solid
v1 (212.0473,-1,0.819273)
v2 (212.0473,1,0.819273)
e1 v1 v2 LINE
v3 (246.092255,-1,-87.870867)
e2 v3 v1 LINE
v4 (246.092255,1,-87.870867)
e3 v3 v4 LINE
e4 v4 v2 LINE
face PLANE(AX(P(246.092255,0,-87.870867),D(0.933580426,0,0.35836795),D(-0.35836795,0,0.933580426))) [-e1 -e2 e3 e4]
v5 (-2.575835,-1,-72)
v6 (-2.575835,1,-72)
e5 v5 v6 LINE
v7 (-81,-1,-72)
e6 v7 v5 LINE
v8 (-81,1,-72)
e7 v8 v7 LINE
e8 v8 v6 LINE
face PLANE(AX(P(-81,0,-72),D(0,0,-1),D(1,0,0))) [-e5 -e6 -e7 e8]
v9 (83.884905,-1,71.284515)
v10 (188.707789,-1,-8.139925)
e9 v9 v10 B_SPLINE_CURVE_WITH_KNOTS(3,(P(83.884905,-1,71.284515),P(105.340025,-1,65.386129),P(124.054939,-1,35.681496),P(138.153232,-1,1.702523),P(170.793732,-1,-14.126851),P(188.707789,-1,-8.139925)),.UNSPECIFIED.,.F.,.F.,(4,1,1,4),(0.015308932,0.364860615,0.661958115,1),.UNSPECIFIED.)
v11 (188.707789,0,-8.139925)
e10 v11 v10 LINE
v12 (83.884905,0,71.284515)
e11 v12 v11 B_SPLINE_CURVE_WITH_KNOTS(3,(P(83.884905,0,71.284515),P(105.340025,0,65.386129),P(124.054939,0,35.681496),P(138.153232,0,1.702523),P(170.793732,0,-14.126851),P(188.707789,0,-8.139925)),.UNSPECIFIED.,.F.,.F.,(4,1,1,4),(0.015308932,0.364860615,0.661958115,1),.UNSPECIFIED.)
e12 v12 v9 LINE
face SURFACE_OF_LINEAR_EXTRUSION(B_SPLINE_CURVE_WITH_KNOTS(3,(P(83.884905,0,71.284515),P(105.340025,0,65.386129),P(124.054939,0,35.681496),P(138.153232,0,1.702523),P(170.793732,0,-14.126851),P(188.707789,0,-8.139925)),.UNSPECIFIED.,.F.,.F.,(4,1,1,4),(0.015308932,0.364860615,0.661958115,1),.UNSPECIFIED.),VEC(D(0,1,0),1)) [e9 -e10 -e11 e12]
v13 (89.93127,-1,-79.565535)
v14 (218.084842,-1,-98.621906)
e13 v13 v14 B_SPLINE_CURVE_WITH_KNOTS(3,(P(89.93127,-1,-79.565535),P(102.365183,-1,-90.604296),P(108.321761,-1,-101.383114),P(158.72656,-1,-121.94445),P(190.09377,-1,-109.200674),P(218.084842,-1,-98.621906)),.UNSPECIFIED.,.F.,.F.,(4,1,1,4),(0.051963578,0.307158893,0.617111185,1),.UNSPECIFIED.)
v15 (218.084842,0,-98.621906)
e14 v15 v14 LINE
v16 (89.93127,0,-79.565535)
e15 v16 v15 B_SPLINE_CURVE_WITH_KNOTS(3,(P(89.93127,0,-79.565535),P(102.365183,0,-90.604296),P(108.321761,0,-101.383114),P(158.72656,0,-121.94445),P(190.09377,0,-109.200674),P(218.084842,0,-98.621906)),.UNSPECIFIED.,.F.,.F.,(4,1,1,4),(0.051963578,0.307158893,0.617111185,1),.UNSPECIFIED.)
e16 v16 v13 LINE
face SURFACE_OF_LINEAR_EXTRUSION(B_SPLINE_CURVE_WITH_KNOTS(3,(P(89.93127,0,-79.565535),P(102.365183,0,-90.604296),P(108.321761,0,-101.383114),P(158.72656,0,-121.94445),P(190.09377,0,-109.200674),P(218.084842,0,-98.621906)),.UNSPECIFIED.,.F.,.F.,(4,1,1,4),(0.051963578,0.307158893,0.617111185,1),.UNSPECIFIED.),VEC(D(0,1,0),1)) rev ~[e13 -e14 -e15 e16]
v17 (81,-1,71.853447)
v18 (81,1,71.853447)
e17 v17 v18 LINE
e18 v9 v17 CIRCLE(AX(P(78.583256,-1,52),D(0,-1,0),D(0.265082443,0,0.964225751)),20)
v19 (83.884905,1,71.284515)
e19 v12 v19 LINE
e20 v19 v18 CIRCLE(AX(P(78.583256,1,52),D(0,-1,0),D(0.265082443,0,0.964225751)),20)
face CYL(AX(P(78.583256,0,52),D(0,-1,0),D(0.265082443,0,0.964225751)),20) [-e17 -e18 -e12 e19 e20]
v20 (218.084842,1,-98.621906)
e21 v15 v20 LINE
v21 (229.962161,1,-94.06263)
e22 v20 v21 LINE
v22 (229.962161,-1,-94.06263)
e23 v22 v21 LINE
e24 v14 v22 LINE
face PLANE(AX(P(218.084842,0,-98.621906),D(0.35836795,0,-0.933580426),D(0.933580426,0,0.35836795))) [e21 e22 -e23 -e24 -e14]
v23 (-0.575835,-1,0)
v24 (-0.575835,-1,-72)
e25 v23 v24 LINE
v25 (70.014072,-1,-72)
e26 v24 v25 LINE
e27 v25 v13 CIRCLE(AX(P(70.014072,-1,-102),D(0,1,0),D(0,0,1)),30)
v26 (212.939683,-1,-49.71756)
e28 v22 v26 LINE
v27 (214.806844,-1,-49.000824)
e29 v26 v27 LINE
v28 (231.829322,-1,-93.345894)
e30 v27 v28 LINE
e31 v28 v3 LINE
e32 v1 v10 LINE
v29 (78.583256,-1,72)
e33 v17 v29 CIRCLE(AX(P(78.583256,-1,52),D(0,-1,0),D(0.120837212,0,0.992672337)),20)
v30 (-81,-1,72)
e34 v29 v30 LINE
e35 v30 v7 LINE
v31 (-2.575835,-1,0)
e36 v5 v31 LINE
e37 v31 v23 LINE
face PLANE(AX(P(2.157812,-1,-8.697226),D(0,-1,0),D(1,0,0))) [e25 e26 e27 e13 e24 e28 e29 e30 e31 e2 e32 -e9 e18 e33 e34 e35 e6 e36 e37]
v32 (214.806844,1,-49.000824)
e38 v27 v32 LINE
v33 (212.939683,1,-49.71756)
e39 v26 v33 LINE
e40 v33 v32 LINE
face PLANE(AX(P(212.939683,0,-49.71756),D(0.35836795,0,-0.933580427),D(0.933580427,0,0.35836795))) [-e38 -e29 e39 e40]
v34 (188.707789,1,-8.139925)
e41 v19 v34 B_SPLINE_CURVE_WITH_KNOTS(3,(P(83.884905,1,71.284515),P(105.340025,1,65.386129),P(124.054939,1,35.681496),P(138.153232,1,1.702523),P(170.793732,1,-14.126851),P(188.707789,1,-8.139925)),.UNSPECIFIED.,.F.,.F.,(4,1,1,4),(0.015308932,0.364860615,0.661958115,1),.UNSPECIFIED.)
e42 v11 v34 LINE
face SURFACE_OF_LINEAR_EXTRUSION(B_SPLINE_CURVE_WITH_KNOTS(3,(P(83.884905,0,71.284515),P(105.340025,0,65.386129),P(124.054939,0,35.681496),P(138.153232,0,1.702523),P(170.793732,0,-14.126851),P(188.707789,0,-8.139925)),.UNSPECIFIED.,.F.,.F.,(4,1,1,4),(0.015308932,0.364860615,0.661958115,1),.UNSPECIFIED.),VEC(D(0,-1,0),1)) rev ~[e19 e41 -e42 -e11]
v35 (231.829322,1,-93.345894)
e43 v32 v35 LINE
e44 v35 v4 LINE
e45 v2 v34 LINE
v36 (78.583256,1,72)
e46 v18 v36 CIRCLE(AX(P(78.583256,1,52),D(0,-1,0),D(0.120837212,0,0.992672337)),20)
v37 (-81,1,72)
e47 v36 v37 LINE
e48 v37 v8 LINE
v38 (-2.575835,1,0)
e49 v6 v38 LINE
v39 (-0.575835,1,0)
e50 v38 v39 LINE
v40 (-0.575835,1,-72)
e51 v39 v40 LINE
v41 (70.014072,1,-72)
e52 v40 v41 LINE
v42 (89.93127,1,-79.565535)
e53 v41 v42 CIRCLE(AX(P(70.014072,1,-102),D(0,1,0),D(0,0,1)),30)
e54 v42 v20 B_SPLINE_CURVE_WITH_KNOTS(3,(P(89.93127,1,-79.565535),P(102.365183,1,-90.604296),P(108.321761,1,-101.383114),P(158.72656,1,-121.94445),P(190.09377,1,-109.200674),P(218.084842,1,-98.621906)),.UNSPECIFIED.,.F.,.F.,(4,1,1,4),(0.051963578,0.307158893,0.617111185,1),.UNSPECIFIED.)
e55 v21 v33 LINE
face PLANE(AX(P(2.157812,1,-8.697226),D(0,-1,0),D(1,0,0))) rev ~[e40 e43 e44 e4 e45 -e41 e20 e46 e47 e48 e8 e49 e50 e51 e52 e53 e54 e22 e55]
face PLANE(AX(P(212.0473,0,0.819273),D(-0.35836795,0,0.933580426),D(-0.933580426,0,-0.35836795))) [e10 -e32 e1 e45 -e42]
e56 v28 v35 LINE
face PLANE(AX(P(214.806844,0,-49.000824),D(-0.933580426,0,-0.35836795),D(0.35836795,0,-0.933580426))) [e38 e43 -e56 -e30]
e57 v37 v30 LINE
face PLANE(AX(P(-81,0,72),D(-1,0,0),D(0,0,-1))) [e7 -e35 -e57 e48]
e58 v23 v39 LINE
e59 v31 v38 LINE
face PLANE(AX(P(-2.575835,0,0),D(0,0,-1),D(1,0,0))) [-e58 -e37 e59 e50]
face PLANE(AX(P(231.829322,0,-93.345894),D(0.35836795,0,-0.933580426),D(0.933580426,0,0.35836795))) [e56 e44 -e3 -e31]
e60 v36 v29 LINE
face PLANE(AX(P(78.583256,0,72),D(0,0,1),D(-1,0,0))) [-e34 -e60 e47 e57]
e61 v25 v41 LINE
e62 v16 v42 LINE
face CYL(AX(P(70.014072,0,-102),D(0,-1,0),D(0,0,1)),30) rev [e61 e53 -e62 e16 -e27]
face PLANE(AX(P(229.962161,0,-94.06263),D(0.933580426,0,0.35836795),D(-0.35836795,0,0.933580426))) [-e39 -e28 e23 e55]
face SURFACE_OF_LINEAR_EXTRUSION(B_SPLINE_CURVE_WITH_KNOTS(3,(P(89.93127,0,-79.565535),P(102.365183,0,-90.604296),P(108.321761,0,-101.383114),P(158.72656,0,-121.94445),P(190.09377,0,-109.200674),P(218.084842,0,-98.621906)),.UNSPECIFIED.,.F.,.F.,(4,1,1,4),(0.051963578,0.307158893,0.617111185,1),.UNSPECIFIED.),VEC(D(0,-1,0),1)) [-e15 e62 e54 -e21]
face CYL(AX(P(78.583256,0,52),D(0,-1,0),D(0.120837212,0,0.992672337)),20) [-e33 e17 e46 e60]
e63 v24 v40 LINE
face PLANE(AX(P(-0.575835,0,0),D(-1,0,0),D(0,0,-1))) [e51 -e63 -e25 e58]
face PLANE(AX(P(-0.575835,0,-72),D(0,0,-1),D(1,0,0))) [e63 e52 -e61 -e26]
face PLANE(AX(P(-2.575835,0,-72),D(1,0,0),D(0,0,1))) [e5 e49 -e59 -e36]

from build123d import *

# Parameters (mm, degrees)
F1_DEPTH = 1


with BuildPart() as f1:
    # F0 (on Front) → F1 (new body, symmetric)
    with BuildSketch(Plane.XZ):
        with BuildLine():
            Line((78.5832557587, 72), (-81, 72))
            Line((-81, 72), (-81, -72))
            Line((-81, -72), (-2.5758354459, -72))
            Line((-2.5758354459, -72), (-2.5758354459, 0))
            Line((-2.5758354459, 0), (-0.5758354459, 0))
            Line((-0.5758354459, 0), (-0.5758354459, -72))
            Line((-0.5758354459, -72), (70.0140722752, -72))
            ThreePointArc((70.0140722752, -72), (80.6669131732, -73.9550899306), (89.9312699398, -79.5655346133))
            add(Edge.make_bspline(
                [(81, -72), (84.4635983749, -74.8141629135), (87.3994420895, -77.31779147), (89.9312699398, -79.5655346133)],
                knots=[0, 0, 0, 0, 0.0519635784, 0.0519635784, 0.0519635784, 0.0519635784], degree=3))
            Line((81, -72), (81, 71.8534467353))
            ThreePointArc((81, 71.8534467353), (79.7938476168, 71.9633280631), (78.5832557587, 72))
        make_face()
        with BuildLine():
            Line((81, 72), (81, 71.8534467353))
            Line((81, 71.8534467353), (81, -72))
            add(Edge.make_bspline(
                [(81, -72), (84.4635983749, -74.8141629135), (87.3994420895, -77.31779147), (89.9312699398, -79.5655346133)],
                knots=[0, 0, 0, 0, 0.0519635784, 0.0519635784, 0.0519635784, 0.0519635784], degree=3))
            add(Edge.make_bspline(
                [(89.9312699398, -79.5655346133), (102.3651827748, -90.6042955291), (108.3217609729, -101.383114475), (158.7265599507, -121.9444495797), (190.0937696642, -109.2006741806), (218.0848423474, -98.6219057368)],
                knots=[0.0519635784, 0.0519635784, 0.0519635784, 0.0519635784, 0.3071588928, 0.6171111846, 1, 1, 1, 1], degree=3))
            Line((218.0848423474, -98.6219057368), (229.9621609222, -94.0626303033))
            Line((229.9621609222, -94.0626303033), (212.9396833188, -49.7175600446))
            Line((212.9396833188, -49.7175600446), (214.8068441718, -49.0008241456))
            Line((214.8068441718, -49.0008241456), (231.8293217752, -93.3458944042))
            Line((231.8293217752, -93.3458944042), (246.0922551423, -87.8708672505))
            Line((246.0922551423, -87.8708672505), (212.0472999355, 0.8192732668))
            Line((212.0472999355, 0.8192732668), (188.707789273, -8.1399254719))
            add(Edge.make_bspline(
                [(83.8849046159, 71.2845150158), (105.3400246798, 65.3861290478), (124.0549392531, 35.6814961762), (138.1532322102, 1.7025226497), (170.7937318796, -14.1268512491), (188.707789273, -8.1399254719)],
                knots=[0.0153089318, 0.0153089318, 0.0153089318, 0.0153089318, 0.3648606153, 0.6619581151, 1, 1, 1, 1], degree=3))
            add(Edge.make_bspline(
                [(81, 72), (81.9838635002, 71.7816800805), (82.9452582497, 71.542840158), (83.8849046159, 71.2845150158)],
                knots=[0, 0, 0, 0, 0.0153089318, 0.0153089318, 0.0153089318, 0.0153089318], degree=3))
        make_face()
        with BuildLine():
            ThreePointArc((83.8849046159, 71.2845150158), (82.45292226, 71.6220712762), (81, 71.8534467353))
            Line((81, 71.8534467353), (81, 72))
            add(Edge.make_bspline(
                [(81, 72), (81.9838635002, 71.7816800805), (82.9452582497, 71.542840158), (83.8849046159, 71.2845150158)],
                knots=[0, 0, 0, 0, 0.0153089318, 0.0153089318, 0.0153089318, 0.0153089318], degree=3))
        make_face(mode=Mode.SUBTRACT)
    extrude(amount=F1_DEPTH, both=True)


solid = f1.part
